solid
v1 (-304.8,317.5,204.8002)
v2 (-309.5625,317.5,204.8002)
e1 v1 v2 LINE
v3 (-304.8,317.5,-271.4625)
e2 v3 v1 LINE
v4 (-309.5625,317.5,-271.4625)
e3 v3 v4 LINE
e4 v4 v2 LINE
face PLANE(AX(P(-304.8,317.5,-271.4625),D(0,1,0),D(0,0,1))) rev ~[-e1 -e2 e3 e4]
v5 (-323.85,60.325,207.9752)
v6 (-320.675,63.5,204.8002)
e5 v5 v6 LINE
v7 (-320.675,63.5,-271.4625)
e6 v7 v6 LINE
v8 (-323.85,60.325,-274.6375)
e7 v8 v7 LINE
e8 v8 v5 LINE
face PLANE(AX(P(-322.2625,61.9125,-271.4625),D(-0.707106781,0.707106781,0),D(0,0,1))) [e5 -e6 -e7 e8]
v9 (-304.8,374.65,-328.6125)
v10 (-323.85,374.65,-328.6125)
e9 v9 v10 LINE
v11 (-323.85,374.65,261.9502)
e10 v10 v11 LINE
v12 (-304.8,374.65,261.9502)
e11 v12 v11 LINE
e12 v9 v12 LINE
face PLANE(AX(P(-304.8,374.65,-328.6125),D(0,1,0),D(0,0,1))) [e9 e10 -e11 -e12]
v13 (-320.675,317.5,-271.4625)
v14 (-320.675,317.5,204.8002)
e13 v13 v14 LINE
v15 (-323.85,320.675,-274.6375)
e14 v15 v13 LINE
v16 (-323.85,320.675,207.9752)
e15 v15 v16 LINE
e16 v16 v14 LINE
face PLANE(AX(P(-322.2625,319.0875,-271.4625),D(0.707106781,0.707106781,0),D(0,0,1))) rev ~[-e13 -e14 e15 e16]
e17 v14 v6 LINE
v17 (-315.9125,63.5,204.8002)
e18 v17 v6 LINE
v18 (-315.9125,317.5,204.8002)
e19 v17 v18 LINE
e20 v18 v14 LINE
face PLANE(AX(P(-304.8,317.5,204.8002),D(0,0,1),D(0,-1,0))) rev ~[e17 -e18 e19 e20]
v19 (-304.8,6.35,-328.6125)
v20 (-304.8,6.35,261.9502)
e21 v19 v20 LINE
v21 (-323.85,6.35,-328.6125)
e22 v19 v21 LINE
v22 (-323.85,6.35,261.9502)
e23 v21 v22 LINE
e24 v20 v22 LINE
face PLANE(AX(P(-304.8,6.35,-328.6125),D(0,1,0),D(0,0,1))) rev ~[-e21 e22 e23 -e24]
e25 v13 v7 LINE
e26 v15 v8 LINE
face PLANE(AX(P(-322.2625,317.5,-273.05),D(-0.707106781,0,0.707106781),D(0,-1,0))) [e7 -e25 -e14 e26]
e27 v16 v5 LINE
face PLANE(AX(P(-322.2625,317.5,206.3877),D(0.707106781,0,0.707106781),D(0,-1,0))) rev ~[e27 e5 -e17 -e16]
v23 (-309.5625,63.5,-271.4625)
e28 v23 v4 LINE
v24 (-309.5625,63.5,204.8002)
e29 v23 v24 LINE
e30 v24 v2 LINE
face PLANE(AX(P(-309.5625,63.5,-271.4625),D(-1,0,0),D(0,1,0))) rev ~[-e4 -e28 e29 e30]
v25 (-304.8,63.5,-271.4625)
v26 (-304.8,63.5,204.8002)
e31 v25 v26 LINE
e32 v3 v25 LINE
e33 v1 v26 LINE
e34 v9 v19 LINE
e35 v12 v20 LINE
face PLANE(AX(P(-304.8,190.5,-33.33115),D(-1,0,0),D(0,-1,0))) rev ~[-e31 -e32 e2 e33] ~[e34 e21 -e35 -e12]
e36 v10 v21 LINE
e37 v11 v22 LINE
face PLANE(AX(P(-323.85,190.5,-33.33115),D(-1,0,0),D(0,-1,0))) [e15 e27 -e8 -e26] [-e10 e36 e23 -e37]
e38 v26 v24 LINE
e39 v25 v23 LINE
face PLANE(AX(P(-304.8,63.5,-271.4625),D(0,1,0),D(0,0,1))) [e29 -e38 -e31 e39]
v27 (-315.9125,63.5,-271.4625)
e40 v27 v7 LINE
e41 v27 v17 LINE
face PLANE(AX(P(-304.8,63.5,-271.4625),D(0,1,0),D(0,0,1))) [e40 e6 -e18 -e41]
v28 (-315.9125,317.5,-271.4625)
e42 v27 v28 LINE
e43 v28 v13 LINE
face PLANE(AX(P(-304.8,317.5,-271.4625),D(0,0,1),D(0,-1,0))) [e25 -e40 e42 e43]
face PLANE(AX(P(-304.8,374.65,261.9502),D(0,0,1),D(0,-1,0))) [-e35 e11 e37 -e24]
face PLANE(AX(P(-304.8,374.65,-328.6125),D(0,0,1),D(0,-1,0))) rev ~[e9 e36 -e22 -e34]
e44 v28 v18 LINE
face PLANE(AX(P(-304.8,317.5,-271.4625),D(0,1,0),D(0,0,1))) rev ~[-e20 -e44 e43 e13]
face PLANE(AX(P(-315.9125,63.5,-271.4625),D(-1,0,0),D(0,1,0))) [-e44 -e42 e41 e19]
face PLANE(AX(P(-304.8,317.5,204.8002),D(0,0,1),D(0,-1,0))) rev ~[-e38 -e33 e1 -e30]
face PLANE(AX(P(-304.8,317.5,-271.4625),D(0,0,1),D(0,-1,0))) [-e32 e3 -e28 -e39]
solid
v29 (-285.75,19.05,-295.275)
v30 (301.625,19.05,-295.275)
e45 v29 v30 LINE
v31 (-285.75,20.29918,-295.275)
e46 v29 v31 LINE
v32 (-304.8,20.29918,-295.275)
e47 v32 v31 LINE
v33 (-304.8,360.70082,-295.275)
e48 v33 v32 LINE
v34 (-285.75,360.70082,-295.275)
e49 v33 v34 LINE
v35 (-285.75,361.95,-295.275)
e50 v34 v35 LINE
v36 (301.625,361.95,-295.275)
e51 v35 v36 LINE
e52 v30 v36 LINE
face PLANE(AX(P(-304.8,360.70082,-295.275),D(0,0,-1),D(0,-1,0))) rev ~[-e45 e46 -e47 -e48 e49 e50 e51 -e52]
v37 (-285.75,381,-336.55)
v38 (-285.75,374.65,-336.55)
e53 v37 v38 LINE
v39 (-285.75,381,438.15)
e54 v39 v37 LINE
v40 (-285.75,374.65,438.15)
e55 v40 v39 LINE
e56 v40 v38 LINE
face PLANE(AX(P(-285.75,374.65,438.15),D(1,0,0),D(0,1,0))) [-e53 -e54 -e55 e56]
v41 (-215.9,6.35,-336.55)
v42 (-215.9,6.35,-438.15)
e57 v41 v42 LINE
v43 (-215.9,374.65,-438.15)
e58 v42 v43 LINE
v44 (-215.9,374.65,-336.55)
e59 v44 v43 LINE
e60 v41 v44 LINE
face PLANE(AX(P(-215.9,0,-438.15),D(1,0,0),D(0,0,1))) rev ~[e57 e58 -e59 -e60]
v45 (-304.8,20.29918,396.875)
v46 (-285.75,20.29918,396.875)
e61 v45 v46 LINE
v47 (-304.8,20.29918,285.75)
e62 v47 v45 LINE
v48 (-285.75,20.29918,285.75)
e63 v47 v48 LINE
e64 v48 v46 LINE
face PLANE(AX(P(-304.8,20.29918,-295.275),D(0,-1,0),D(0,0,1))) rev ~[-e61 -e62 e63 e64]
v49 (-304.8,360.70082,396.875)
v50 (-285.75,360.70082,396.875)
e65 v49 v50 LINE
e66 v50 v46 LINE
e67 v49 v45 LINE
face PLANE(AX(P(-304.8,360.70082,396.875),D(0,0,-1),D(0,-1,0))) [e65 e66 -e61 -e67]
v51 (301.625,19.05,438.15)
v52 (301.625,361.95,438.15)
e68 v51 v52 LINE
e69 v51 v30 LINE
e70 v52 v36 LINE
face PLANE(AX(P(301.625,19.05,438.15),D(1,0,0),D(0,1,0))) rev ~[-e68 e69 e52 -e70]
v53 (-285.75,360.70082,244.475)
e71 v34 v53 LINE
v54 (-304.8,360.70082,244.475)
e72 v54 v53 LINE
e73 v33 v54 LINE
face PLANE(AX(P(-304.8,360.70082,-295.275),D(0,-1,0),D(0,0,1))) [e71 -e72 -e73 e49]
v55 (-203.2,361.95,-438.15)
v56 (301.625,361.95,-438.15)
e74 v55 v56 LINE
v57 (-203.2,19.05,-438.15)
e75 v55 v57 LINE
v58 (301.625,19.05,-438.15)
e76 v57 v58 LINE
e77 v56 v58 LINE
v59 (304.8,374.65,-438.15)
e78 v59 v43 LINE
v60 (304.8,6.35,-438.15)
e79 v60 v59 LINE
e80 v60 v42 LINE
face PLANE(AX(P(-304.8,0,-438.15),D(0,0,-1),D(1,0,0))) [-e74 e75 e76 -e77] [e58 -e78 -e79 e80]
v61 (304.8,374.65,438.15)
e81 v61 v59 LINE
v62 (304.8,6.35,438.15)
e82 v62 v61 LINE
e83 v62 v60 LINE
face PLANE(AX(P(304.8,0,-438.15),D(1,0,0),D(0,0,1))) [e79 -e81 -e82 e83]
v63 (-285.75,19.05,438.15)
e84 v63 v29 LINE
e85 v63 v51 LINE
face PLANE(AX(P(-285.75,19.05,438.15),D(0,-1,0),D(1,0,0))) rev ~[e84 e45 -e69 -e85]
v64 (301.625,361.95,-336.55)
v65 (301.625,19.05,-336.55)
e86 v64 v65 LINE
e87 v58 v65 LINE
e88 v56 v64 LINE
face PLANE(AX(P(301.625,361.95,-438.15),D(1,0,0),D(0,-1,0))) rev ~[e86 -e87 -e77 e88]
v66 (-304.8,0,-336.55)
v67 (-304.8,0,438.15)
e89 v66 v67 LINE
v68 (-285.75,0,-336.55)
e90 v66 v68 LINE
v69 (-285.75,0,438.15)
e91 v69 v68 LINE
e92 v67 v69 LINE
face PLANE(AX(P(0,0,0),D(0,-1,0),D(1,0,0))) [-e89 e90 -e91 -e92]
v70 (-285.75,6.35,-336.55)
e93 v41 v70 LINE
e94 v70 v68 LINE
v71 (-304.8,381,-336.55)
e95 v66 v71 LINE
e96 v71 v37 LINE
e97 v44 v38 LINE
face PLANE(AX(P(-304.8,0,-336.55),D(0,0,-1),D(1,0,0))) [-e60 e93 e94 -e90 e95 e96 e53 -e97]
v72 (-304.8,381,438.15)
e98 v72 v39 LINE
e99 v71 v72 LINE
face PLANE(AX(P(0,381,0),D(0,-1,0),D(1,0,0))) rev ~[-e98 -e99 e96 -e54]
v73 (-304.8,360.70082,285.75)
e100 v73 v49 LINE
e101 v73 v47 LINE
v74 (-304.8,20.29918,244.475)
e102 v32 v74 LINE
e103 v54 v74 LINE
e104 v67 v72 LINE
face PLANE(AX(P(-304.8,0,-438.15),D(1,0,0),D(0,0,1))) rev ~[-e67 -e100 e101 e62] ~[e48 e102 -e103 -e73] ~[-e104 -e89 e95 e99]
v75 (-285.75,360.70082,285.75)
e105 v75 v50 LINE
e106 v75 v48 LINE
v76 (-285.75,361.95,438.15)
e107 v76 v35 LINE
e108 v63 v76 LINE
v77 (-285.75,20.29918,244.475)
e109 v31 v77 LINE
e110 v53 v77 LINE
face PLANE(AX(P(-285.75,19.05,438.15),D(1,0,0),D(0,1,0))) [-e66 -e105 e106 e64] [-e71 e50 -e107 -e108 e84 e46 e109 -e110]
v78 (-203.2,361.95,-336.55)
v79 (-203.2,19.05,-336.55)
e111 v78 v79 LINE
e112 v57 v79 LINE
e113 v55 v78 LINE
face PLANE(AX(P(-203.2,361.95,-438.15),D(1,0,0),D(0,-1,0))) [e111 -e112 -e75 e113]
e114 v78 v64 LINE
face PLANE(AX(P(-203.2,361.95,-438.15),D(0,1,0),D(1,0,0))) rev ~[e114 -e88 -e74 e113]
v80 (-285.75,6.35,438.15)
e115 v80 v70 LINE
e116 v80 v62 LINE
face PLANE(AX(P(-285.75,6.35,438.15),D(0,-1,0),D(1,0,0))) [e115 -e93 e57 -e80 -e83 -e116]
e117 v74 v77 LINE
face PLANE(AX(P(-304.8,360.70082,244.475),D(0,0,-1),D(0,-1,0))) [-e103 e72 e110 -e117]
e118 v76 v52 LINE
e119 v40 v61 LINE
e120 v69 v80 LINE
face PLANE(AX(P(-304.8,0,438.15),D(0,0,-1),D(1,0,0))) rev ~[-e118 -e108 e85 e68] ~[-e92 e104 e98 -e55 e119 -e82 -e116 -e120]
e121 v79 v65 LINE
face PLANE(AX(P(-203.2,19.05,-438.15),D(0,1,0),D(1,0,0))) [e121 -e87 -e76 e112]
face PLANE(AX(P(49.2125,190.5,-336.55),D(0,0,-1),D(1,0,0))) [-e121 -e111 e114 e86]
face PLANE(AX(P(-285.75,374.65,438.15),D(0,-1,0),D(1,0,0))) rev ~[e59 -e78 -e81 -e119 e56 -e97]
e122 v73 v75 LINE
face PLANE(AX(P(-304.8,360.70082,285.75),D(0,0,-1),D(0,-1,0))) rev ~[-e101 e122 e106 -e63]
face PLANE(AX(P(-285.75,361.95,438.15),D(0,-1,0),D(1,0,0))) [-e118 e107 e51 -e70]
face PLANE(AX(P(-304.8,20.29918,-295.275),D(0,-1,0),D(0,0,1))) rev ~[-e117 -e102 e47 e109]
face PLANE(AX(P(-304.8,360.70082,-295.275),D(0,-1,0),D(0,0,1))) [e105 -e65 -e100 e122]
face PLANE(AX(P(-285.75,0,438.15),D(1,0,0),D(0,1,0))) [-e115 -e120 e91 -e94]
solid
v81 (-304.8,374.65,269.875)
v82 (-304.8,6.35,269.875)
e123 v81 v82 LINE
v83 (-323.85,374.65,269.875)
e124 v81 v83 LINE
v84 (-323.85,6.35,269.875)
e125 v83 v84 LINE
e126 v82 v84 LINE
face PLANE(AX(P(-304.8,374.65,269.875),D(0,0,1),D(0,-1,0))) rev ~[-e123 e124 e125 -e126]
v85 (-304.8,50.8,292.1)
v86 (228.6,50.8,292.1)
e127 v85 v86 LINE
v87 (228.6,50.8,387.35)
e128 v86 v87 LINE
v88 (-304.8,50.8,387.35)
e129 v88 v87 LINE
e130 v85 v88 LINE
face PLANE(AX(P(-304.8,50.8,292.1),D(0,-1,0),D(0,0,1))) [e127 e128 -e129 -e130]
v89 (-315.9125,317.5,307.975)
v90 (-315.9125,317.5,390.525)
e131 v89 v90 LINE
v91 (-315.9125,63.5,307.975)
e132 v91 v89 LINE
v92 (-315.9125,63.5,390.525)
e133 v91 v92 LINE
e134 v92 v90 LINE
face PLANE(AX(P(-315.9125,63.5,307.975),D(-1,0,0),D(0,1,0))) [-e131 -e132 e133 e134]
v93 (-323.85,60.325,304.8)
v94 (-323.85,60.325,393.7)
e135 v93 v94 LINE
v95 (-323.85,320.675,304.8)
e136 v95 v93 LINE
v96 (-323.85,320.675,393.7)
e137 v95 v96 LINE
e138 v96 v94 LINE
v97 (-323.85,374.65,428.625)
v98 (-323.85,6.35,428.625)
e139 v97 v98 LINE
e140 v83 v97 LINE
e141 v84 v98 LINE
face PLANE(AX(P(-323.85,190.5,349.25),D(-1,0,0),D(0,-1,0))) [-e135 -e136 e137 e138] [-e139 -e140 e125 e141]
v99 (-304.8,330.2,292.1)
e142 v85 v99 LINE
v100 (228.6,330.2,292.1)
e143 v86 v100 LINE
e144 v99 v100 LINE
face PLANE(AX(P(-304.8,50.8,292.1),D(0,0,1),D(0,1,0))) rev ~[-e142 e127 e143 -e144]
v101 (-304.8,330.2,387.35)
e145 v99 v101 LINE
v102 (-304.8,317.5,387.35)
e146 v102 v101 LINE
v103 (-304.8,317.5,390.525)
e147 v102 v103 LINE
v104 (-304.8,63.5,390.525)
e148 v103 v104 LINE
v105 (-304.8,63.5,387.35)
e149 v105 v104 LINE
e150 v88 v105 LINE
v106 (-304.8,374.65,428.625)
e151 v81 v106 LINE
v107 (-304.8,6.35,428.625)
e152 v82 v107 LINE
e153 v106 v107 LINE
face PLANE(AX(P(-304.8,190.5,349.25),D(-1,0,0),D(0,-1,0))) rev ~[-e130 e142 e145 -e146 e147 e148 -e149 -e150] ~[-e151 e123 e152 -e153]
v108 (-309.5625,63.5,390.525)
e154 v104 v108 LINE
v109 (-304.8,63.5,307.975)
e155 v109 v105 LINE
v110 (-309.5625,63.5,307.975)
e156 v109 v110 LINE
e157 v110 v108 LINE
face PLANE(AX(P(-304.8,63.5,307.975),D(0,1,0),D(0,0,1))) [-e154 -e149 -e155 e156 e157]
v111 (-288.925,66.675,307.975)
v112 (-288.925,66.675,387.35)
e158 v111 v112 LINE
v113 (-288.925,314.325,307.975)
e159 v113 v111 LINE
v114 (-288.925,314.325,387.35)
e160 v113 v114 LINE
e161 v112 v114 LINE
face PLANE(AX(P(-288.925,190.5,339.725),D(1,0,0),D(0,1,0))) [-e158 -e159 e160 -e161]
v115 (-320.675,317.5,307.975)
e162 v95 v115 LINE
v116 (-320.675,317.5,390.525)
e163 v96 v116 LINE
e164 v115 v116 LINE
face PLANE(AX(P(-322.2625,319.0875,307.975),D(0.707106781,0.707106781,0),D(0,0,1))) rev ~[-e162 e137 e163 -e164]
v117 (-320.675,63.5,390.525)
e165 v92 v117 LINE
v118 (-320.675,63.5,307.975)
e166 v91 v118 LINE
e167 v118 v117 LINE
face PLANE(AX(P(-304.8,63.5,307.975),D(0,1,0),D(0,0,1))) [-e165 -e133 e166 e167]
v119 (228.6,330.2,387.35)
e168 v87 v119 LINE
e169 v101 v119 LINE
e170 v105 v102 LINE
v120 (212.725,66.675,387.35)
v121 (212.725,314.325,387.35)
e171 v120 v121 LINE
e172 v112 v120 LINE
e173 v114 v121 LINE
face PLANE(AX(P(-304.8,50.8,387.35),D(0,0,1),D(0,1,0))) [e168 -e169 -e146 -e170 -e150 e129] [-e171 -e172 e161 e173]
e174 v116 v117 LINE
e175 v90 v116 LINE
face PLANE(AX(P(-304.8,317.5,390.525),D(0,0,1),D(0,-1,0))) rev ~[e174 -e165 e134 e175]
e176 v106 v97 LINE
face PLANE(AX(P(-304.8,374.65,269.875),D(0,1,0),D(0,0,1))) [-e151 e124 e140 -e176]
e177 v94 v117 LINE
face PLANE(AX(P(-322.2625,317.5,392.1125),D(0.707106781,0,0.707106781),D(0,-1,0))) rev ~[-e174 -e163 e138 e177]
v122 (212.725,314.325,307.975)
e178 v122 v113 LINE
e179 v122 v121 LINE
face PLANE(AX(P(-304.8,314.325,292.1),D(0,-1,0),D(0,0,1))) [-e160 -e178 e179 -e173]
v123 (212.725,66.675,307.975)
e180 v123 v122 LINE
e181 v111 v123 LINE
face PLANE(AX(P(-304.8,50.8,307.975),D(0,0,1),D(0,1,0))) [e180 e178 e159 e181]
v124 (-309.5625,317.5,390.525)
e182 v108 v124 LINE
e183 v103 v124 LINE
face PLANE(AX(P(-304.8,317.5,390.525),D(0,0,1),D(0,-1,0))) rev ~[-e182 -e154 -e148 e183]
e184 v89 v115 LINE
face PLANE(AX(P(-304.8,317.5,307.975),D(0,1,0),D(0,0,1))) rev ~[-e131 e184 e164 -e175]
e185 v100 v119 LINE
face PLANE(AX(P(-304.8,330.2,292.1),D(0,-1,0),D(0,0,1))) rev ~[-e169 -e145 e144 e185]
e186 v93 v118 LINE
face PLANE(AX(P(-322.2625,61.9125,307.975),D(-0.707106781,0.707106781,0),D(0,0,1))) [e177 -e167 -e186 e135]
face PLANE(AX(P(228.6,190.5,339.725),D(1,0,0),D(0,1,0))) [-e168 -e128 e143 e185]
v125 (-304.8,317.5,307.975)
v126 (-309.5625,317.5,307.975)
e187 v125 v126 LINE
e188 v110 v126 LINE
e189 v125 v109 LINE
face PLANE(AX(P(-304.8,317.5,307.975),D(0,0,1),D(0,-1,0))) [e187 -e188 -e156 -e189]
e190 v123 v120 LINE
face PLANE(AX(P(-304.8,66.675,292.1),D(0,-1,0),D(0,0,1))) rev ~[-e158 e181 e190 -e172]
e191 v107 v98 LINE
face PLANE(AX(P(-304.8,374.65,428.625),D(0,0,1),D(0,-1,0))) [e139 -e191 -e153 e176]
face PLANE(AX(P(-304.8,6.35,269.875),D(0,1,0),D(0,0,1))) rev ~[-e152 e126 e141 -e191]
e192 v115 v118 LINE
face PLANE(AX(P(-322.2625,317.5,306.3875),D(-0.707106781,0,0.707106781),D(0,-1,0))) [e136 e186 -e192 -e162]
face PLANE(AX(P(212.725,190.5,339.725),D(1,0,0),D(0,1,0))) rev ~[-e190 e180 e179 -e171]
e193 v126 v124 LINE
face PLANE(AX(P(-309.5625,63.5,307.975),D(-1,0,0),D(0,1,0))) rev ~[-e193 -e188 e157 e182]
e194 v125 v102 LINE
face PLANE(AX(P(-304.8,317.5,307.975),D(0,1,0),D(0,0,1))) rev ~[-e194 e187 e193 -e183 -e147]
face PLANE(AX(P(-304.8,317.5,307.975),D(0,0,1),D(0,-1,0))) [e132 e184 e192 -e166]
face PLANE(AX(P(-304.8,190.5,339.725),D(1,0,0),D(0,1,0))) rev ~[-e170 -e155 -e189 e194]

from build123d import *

# Parameters (mm, degrees)
F0_W          = 609.6
F0_H          = 876.3
F1_DEPTH      = 381
F2_W          = 88.9
F2_H          = 101.6
F3_DEPTH      = 381.001
F4_W          = 340.4016393443
F4_H          = 692.15
F5_DEPTH      = 19.05
F6_W          = 590.55
F6_H          = 6.35
F7_DEPTH      = 876.301
F8_W          = 587.375
F8_H          = 342.9
F9_DEPTH      = 733.425
F10_W         = 340.4016393443
F10_H         = 41.275
F11_DEPTH     = 19.05
F12_W         = 368.3
F12_H         = 590.5627
F12_W_2       = 254
F12_H_2       = 476.2627
F13_DEPTH     = 19.05
F14_W         = 6.35
F14_H         = 254
F15_DEPTH     = 476.2627
F16_SIZE      = 3.175
F17_W         = 368.3
F17_H         = 158.75
F17_W_2       = 254
F17_H_2       = 82.55
F18_DEPTH     = 19.05
F19_W         = 6.35
F19_H         = 254
F20_DEPTH     = 82.55
F21_SIZE      = 3.175
F22_W         = 504.825
F22_H         = 342.9
F23_DEPTH     = 101.6
F24_W         = 279.4
F24_H         = 95.25
F25_DEPTH     = 533.4
F26_T         = 15.875
F26_T3_DEPTH  = 37.249261314
F26_T5_DEPTH  = 37.249261314
F26_T7_DEPTH  = 37.249261314
F26_T9_DEPTH  = 37.249261314
F26_T11_DEPTH = 36.5125
F26_T13_DEPTH = 285.75
F26_T15_DEPTH = 114.3
F26_T17_DEPTH = 127
F26_T19_DEPTH = 311.15
F26_T21_DEPTH = 111.125
F26_T23_DEPTH = 36.5125


# Not quite as in the source:
# - a shell that OpenCascade refuses in one call is made with other operations: the cavity is built on its own and cut out


with BuildPart() as f1:
    # F0 (on Front) → F1 (new body)
    with BuildSketch(Plane.XZ):
        Rectangle(F0_W, F0_H)
    extrude(amount=-F1_DEPTH)

    # F2 (on face) → F3 (cut, through all)
    with BuildSketch(Plane.XZ):
        with Locations((-260.35, -387.35)):
            Rectangle(F2_W, F2_H)
    extrude(amount=-F3_DEPTH, mode=Mode.SUBTRACT)

    # F4 (on face) → F5 (cut)
    with BuildSketch(Plane(origin=(-304.8, 0, 0), x_dir=(0, -1, 0), z_dir=(-1, 0, 0))):
        with Locations((-190.5, 50.8)):
            Rectangle(F4_W, F4_H)
    extrude(amount=-F5_DEPTH, mode=Mode.SUBTRACT)

    # F6 (on face) → F7 (cut, through all)
    with BuildSketch(Plane.XY.offset(438.15)):
        with Locations((9.525, 377.825)):
            Rectangle(F6_W, F6_H)
        with Locations((9.525, 3.175)):
            Rectangle(F6_W, F6_H)
    extrude(amount=-F7_DEPTH, mode=Mode.SUBTRACT)

    # F8 (on face) → F9 (cut, through all)
    with BuildSketch(Plane.XY.offset(438.15)):
        with Locations((7.9375, 190.5)):
            Rectangle(F8_W, F8_H)
    extrude(amount=-F9_DEPTH, mode=Mode.SUBTRACT)

    # F10 (on face) → F11 (join, through all)
    with BuildSketch(Plane(origin=(-304.8, 0, 0), x_dir=(0, -1, 0), z_dir=(-1, 0, 0))):
        with Locations((-190.5, 265.1125)):
            Rectangle(F10_W, F10_H)
    extrude(amount=-F11_DEPTH)

    # F22 (on face) → F23 (cut)
    with BuildSketch(Plane(origin=(0, 0, -438.15), x_dir=(1, 0, 0), z_dir=(0, 0, -1))):
        with Locations((49.2125, -190.5)):
            Rectangle(F22_W, F22_H)
    extrude(amount=-F23_DEPTH, mode=Mode.SUBTRACT)


with BuildPart() as f13:
    # F12 (on face) → F13 (new body)
    with BuildSketch(Plane(origin=(-304.8, 0, 0), x_dir=(0, -1, 0), z_dir=(-1, 0, 0))):
        with Locations((-190.5, -33.33115)):
            Rectangle(F12_W, F12_H)
        with Locations((-190.5, -33.33115)):
            Rectangle(F12_W_2, F12_H_2, mode=Mode.SUBTRACT)
    extrude(amount=F13_DEPTH)

    # F14 (on face) → F15 (join, through all)
    with BuildSketch(Plane.XY.offset(-271.4625)):
        with Locations((-312.7375, 190.5)):
            Rectangle(F14_W, F14_H)
    extrude(amount=F15_DEPTH)

    # F16
    f16_edges = [f13.edges().sort_by_distance(p)[0] for p in [
        (-323.85, 317.5, -33.33115),
        (-323.85, 190.5, -271.4625),
        (-323.85, 63.5, -33.33115),
        (-323.85, 190.5, 204.8002),
    ]]
    chamfer(f16_edges, length=F16_SIZE)


with BuildPart() as f18:
    # F17 (on face) → F18 (new body)
    with BuildSketch(Plane(origin=(-304.8, 0, 0), x_dir=(0, -1, 0), z_dir=(-1, 0, 0))):
        with Locations((-190.5, 349.25)):
            Rectangle(F17_W, F17_H)
        with Locations((-190.5, 349.25)):
            Rectangle(F17_W_2, F17_H_2, mode=Mode.SUBTRACT)
    extrude(amount=F18_DEPTH)

    # F19 (on face) → F20 (join, through all)
    with BuildSketch(Plane.XY.offset(307.975)):
        with Locations((-312.7375, 190.5)):
            Rectangle(F19_W, F19_H)
    extrude(amount=F20_DEPTH)

    # F21
    f21_edges = [f18.edges().sort_by_distance(p)[0] for p in [
        (-323.85, 190.5, 307.975),
        (-323.85, 317.5, 349.25),
        (-323.85, 190.5, 390.525),
        (-323.85, 63.5, 349.25),
    ]]
    chamfer(f21_edges, length=F21_SIZE)

    # F24 (on face) → F25 (join)
    with BuildSketch(Plane.YZ.offset(-304.8)):
        with Locations((190.5, 339.725)):
            Rectangle(F24_W, F24_H)
    extrude(amount=F25_DEPTH)

    # F26: shell of thickness 15.875, made by hand


with BuildPart() as f26_core1:
    # F26_t2: copy of F18
    add(f18.part)

    # the walls: a layer under each face that stays
    f26_faces = [f26_core1.faces().sort_by_distance(p)[0] for p in [
        (-323.85, 313.2666666667, 296.3333333333),
        (-322.2625, 190.5, 306.3875),
        (-322.2625, 61.9125, 349.25),
        (-322.2625, 319.0875, 349.25),
        (-322.2625, 190.5, 392.1125),
        (-314.325, 190.5, 428.625),
        (-314.325, 374.65, 349.25),
        (-314.325, 190.5, 269.875),
        (-314.325, 6.35, 349.25),
        (-318.29375, 190.5, 307.975),
        (-318.29375, 63.5, 349.25),
        (-318.29375, 317.5, 349.25),
        (-318.29375, 190.5, 390.525),
        (-304.8, 313.2666666667, 402.1666666667),
        (-315.9125, 190.5, 349.25),
        (-38.1, 330.2, 339.725),
        (-38.1, 190.5, 292.1),
        (-38.1, 50.8, 339.725),
        (-307.18125, 63.5, 349.25),
        (-307.18125, 190.5, 390.525),
        (-307.18125, 317.5, 349.25),
        (-304.8, 190.5, 347.6625),
        (228.6, 190.5, 339.725),
        (-307.18125, 190.5, 307.975),
        (-309.5625, 190.5, 349.25),
    ]]
    thicken(f26_faces, amount=-F26_T, mode=Mode.SUBTRACT)

    # F26_s4 → F26_t3 (cut)
    with BuildSketch(Plane(origin=(4.5928978099, 4.5928978099, 4.5928978099), x_dir=(-0.7071067812, 0.7071067812, 0), z_dir=(0.5773502692, 0.5773502692, 0.5773502692))):
        Polygon((271.8908726623, 356.5892701441), (263.7152476623, 342.7036353262), (255.7777476623, 347.2863530879), (255.7777476623, 356.4517886113), align=None)
    extrude(amount=F26_T3_DEPTH, mode=Mode.SUBTRACT)

    # F26_s6 → F26_t5 (cut)
    with BuildSketch(Plane(origin=(-122.4071021901, 122.4071021901, -122.4071021901), x_dir=(0.7071067812, 0.7071067812, 0), z_dir=(0.5773502692, -0.5773502692, 0.5773502692))):
        Polygon((-2.4831890303, 512.1318688108), (5.6924359697, 498.2462339929), (13.6299359697, 502.8289517546), (13.6299359697, 511.994387278), align=None)
    extrude(amount=F26_T5_DEPTH, mode=Mode.SUBTRACT)

    # F26_s8 → F26_t7 (cut)
    with BuildSketch(Plane(origin=(-228.2404355234, -228.2404355234, 228.2404355234), x_dir=(-0.7071067812, 0.7071067812, 0), z_dir=(0.5773502692, 0.5773502692, -0.5773502692))):
        Polygon((271.8908726623, 213.7335916339), (255.7777476623, 213.8710731668), (255.7777476623, 223.0365086901), (263.7152476623, 227.6192264518), align=None)
    extrude(amount=F26_T7_DEPTH, mode=Mode.SUBTRACT)

    # F26_s10 → F26_t9 (cut)
    with BuildSketch(Plane(origin=(-355.2404355234, 355.2404355234, 355.2404355234), x_dir=(0.7071067812, 0.7071067812, 0), z_dir=(0.5773502692, -0.5773502692, -0.5773502692))):
        Polygon((-2.4831890303, 58.1909929672), (13.6299359697, 58.3284745), (13.6299359697, 67.4939100234), (5.6924359697, 72.0766277851), align=None)
    extrude(amount=F26_T9_DEPTH, mode=Mode.SUBTRACT)

    # F26_s12 → F26_t11 (cut)
    with BuildSketch(Plane.YZ.offset(-336.55)):
        Polygon((317.34125, 308.13375), (317.5, 292.1), (333.375, 292.1), (333.375, 307.975), align=None)
        Polygon((63.65875, 308.13375), (63.5, 292.1), (47.625, 292.1), (47.625, 307.975), align=None)
        Polygon((63.65875, 390.36625), (47.625, 390.525), (47.625, 406.4), (63.5, 406.4), align=None)
        Polygon((317.34125, 390.36625), (333.375, 390.525), (333.375, 406.4), (317.5, 406.4), align=None)
    extrude(amount=F26_T11_DEPTH, mode=Mode.SUBTRACT)

    # F26_s14 → F26_t13 (cut)
    with BuildSketch(Plane.XZ.offset(-333.375)):
        Polygon((-316.07125, 308.13375), (-315.9125, 292.1), (-300.0375, 292.1), (-300.0375, 307.975), align=None)
        Polygon((-316.07125, 390.36625), (-315.9125, 406.4), (-300.0375, 406.4), (-300.0375, 390.525), align=None)
        Polygon((-309.40375, 390.36625), (-309.5625, 406.4), (-325.4375, 406.4), (-325.4375, 390.525), align=None)
        Polygon((-304.95875, 308.13375), (-288.925, 307.975), (-288.925, 292.1), (-304.8, 292.1), align=None)
        Polygon((-309.40375, 308.13375), (-309.5625, 292.1), (-325.4375, 292.1), (-325.4375, 307.975), align=None)
    extrude(amount=F26_T13_DEPTH, mode=Mode.SUBTRACT)

    # F26_s16 → F26_t15 (cut)
    with BuildSketch(Plane.XY.offset(292.1)):
        Polygon((-316.07125, 63.65875), (-315.9125, 47.625), (-300.0375, 47.625), (-300.0375, 63.5), align=None)
        Polygon((-316.07125, 317.34125), (-315.9125, 333.375), (-300.0375, 333.375), (-300.0375, 317.5), align=None)
        Polygon((-309.40375, 63.65875), (-309.5625, 47.625), (-325.4375, 47.625), (-325.4375, 63.5), align=None)
        Polygon((-309.40375, 317.34125), (-309.5625, 333.375), (-325.4375, 333.375), (-325.4375, 317.5), align=None)
    extrude(amount=F26_T15_DEPTH, mode=Mode.SUBTRACT)

    # F26_s18 → F26_t17 (cut)
    with BuildSketch(Plane.XY.offset(276.225)):
        Polygon((-304.64125, 330.35875), (-320.675, 330.2), (-320.675, 314.325), (-304.8, 314.325), align=None)
        Polygon((-304.64125, 50.64125), (-320.675, 50.8), (-320.675, 66.675), (-304.8, 66.675), align=None)
    extrude(amount=F26_T17_DEPTH, mode=Mode.SUBTRACT)

    # F26_s20 → F26_t19 (cut)
    with BuildSketch(Plane.XZ.offset(-346.075)):
        Polygon((-304.64125, 291.94125), (-320.675, 292.1), (-320.675, 307.975), (-304.8, 307.975), align=None)
    extrude(amount=F26_T19_DEPTH, mode=Mode.SUBTRACT)

    # F26_s22 → F26_t21 (cut)
    with BuildSketch(Plane.XY.offset(292.1)):
        Polygon((-304.95875, 63.65875), (-304.8, 47.625), (-288.925, 47.625), (-288.925, 63.5), align=None)
        Polygon((-304.95875, 317.34125), (-304.8, 333.375), (-288.925, 333.375), (-288.925, 317.5), align=None)
    extrude(amount=F26_T21_DEPTH, mode=Mode.SUBTRACT)

    # F26_s24 → F26_t23 (cut)
    with BuildSketch(Plane.YZ.offset(-325.4375)):
        Polygon((63.65875, 308.13375), (47.625, 307.975), (47.625, 292.1), (63.5, 292.1), align=None)
        Polygon((63.65875, 390.36625), (47.625, 390.525), (47.625, 406.4), (63.5, 406.4), align=None)
        Polygon((317.34125, 390.36625), (317.5, 406.4), (333.375, 406.4), (333.375, 390.525), align=None)
        Polygon((317.34125, 308.13375), (333.375, 307.975), (333.375, 292.1), (317.5, 292.1), align=None)
    extrude(amount=F26_T23_DEPTH, mode=Mode.SUBTRACT)


with BuildPart() as f18_1:
    add(f18.part)

    # what is left inside the walls is the cavity
    f26_cavity = [f26_core1.part.solids().sort_by_distance(p)[0] for p in [
        (45.508333, 190.5, 308.13375),
    ]]
    add(f26_cavity, mode=Mode.SUBTRACT)


solid = Compound([f1.part, f13.part, f18_1.part])
